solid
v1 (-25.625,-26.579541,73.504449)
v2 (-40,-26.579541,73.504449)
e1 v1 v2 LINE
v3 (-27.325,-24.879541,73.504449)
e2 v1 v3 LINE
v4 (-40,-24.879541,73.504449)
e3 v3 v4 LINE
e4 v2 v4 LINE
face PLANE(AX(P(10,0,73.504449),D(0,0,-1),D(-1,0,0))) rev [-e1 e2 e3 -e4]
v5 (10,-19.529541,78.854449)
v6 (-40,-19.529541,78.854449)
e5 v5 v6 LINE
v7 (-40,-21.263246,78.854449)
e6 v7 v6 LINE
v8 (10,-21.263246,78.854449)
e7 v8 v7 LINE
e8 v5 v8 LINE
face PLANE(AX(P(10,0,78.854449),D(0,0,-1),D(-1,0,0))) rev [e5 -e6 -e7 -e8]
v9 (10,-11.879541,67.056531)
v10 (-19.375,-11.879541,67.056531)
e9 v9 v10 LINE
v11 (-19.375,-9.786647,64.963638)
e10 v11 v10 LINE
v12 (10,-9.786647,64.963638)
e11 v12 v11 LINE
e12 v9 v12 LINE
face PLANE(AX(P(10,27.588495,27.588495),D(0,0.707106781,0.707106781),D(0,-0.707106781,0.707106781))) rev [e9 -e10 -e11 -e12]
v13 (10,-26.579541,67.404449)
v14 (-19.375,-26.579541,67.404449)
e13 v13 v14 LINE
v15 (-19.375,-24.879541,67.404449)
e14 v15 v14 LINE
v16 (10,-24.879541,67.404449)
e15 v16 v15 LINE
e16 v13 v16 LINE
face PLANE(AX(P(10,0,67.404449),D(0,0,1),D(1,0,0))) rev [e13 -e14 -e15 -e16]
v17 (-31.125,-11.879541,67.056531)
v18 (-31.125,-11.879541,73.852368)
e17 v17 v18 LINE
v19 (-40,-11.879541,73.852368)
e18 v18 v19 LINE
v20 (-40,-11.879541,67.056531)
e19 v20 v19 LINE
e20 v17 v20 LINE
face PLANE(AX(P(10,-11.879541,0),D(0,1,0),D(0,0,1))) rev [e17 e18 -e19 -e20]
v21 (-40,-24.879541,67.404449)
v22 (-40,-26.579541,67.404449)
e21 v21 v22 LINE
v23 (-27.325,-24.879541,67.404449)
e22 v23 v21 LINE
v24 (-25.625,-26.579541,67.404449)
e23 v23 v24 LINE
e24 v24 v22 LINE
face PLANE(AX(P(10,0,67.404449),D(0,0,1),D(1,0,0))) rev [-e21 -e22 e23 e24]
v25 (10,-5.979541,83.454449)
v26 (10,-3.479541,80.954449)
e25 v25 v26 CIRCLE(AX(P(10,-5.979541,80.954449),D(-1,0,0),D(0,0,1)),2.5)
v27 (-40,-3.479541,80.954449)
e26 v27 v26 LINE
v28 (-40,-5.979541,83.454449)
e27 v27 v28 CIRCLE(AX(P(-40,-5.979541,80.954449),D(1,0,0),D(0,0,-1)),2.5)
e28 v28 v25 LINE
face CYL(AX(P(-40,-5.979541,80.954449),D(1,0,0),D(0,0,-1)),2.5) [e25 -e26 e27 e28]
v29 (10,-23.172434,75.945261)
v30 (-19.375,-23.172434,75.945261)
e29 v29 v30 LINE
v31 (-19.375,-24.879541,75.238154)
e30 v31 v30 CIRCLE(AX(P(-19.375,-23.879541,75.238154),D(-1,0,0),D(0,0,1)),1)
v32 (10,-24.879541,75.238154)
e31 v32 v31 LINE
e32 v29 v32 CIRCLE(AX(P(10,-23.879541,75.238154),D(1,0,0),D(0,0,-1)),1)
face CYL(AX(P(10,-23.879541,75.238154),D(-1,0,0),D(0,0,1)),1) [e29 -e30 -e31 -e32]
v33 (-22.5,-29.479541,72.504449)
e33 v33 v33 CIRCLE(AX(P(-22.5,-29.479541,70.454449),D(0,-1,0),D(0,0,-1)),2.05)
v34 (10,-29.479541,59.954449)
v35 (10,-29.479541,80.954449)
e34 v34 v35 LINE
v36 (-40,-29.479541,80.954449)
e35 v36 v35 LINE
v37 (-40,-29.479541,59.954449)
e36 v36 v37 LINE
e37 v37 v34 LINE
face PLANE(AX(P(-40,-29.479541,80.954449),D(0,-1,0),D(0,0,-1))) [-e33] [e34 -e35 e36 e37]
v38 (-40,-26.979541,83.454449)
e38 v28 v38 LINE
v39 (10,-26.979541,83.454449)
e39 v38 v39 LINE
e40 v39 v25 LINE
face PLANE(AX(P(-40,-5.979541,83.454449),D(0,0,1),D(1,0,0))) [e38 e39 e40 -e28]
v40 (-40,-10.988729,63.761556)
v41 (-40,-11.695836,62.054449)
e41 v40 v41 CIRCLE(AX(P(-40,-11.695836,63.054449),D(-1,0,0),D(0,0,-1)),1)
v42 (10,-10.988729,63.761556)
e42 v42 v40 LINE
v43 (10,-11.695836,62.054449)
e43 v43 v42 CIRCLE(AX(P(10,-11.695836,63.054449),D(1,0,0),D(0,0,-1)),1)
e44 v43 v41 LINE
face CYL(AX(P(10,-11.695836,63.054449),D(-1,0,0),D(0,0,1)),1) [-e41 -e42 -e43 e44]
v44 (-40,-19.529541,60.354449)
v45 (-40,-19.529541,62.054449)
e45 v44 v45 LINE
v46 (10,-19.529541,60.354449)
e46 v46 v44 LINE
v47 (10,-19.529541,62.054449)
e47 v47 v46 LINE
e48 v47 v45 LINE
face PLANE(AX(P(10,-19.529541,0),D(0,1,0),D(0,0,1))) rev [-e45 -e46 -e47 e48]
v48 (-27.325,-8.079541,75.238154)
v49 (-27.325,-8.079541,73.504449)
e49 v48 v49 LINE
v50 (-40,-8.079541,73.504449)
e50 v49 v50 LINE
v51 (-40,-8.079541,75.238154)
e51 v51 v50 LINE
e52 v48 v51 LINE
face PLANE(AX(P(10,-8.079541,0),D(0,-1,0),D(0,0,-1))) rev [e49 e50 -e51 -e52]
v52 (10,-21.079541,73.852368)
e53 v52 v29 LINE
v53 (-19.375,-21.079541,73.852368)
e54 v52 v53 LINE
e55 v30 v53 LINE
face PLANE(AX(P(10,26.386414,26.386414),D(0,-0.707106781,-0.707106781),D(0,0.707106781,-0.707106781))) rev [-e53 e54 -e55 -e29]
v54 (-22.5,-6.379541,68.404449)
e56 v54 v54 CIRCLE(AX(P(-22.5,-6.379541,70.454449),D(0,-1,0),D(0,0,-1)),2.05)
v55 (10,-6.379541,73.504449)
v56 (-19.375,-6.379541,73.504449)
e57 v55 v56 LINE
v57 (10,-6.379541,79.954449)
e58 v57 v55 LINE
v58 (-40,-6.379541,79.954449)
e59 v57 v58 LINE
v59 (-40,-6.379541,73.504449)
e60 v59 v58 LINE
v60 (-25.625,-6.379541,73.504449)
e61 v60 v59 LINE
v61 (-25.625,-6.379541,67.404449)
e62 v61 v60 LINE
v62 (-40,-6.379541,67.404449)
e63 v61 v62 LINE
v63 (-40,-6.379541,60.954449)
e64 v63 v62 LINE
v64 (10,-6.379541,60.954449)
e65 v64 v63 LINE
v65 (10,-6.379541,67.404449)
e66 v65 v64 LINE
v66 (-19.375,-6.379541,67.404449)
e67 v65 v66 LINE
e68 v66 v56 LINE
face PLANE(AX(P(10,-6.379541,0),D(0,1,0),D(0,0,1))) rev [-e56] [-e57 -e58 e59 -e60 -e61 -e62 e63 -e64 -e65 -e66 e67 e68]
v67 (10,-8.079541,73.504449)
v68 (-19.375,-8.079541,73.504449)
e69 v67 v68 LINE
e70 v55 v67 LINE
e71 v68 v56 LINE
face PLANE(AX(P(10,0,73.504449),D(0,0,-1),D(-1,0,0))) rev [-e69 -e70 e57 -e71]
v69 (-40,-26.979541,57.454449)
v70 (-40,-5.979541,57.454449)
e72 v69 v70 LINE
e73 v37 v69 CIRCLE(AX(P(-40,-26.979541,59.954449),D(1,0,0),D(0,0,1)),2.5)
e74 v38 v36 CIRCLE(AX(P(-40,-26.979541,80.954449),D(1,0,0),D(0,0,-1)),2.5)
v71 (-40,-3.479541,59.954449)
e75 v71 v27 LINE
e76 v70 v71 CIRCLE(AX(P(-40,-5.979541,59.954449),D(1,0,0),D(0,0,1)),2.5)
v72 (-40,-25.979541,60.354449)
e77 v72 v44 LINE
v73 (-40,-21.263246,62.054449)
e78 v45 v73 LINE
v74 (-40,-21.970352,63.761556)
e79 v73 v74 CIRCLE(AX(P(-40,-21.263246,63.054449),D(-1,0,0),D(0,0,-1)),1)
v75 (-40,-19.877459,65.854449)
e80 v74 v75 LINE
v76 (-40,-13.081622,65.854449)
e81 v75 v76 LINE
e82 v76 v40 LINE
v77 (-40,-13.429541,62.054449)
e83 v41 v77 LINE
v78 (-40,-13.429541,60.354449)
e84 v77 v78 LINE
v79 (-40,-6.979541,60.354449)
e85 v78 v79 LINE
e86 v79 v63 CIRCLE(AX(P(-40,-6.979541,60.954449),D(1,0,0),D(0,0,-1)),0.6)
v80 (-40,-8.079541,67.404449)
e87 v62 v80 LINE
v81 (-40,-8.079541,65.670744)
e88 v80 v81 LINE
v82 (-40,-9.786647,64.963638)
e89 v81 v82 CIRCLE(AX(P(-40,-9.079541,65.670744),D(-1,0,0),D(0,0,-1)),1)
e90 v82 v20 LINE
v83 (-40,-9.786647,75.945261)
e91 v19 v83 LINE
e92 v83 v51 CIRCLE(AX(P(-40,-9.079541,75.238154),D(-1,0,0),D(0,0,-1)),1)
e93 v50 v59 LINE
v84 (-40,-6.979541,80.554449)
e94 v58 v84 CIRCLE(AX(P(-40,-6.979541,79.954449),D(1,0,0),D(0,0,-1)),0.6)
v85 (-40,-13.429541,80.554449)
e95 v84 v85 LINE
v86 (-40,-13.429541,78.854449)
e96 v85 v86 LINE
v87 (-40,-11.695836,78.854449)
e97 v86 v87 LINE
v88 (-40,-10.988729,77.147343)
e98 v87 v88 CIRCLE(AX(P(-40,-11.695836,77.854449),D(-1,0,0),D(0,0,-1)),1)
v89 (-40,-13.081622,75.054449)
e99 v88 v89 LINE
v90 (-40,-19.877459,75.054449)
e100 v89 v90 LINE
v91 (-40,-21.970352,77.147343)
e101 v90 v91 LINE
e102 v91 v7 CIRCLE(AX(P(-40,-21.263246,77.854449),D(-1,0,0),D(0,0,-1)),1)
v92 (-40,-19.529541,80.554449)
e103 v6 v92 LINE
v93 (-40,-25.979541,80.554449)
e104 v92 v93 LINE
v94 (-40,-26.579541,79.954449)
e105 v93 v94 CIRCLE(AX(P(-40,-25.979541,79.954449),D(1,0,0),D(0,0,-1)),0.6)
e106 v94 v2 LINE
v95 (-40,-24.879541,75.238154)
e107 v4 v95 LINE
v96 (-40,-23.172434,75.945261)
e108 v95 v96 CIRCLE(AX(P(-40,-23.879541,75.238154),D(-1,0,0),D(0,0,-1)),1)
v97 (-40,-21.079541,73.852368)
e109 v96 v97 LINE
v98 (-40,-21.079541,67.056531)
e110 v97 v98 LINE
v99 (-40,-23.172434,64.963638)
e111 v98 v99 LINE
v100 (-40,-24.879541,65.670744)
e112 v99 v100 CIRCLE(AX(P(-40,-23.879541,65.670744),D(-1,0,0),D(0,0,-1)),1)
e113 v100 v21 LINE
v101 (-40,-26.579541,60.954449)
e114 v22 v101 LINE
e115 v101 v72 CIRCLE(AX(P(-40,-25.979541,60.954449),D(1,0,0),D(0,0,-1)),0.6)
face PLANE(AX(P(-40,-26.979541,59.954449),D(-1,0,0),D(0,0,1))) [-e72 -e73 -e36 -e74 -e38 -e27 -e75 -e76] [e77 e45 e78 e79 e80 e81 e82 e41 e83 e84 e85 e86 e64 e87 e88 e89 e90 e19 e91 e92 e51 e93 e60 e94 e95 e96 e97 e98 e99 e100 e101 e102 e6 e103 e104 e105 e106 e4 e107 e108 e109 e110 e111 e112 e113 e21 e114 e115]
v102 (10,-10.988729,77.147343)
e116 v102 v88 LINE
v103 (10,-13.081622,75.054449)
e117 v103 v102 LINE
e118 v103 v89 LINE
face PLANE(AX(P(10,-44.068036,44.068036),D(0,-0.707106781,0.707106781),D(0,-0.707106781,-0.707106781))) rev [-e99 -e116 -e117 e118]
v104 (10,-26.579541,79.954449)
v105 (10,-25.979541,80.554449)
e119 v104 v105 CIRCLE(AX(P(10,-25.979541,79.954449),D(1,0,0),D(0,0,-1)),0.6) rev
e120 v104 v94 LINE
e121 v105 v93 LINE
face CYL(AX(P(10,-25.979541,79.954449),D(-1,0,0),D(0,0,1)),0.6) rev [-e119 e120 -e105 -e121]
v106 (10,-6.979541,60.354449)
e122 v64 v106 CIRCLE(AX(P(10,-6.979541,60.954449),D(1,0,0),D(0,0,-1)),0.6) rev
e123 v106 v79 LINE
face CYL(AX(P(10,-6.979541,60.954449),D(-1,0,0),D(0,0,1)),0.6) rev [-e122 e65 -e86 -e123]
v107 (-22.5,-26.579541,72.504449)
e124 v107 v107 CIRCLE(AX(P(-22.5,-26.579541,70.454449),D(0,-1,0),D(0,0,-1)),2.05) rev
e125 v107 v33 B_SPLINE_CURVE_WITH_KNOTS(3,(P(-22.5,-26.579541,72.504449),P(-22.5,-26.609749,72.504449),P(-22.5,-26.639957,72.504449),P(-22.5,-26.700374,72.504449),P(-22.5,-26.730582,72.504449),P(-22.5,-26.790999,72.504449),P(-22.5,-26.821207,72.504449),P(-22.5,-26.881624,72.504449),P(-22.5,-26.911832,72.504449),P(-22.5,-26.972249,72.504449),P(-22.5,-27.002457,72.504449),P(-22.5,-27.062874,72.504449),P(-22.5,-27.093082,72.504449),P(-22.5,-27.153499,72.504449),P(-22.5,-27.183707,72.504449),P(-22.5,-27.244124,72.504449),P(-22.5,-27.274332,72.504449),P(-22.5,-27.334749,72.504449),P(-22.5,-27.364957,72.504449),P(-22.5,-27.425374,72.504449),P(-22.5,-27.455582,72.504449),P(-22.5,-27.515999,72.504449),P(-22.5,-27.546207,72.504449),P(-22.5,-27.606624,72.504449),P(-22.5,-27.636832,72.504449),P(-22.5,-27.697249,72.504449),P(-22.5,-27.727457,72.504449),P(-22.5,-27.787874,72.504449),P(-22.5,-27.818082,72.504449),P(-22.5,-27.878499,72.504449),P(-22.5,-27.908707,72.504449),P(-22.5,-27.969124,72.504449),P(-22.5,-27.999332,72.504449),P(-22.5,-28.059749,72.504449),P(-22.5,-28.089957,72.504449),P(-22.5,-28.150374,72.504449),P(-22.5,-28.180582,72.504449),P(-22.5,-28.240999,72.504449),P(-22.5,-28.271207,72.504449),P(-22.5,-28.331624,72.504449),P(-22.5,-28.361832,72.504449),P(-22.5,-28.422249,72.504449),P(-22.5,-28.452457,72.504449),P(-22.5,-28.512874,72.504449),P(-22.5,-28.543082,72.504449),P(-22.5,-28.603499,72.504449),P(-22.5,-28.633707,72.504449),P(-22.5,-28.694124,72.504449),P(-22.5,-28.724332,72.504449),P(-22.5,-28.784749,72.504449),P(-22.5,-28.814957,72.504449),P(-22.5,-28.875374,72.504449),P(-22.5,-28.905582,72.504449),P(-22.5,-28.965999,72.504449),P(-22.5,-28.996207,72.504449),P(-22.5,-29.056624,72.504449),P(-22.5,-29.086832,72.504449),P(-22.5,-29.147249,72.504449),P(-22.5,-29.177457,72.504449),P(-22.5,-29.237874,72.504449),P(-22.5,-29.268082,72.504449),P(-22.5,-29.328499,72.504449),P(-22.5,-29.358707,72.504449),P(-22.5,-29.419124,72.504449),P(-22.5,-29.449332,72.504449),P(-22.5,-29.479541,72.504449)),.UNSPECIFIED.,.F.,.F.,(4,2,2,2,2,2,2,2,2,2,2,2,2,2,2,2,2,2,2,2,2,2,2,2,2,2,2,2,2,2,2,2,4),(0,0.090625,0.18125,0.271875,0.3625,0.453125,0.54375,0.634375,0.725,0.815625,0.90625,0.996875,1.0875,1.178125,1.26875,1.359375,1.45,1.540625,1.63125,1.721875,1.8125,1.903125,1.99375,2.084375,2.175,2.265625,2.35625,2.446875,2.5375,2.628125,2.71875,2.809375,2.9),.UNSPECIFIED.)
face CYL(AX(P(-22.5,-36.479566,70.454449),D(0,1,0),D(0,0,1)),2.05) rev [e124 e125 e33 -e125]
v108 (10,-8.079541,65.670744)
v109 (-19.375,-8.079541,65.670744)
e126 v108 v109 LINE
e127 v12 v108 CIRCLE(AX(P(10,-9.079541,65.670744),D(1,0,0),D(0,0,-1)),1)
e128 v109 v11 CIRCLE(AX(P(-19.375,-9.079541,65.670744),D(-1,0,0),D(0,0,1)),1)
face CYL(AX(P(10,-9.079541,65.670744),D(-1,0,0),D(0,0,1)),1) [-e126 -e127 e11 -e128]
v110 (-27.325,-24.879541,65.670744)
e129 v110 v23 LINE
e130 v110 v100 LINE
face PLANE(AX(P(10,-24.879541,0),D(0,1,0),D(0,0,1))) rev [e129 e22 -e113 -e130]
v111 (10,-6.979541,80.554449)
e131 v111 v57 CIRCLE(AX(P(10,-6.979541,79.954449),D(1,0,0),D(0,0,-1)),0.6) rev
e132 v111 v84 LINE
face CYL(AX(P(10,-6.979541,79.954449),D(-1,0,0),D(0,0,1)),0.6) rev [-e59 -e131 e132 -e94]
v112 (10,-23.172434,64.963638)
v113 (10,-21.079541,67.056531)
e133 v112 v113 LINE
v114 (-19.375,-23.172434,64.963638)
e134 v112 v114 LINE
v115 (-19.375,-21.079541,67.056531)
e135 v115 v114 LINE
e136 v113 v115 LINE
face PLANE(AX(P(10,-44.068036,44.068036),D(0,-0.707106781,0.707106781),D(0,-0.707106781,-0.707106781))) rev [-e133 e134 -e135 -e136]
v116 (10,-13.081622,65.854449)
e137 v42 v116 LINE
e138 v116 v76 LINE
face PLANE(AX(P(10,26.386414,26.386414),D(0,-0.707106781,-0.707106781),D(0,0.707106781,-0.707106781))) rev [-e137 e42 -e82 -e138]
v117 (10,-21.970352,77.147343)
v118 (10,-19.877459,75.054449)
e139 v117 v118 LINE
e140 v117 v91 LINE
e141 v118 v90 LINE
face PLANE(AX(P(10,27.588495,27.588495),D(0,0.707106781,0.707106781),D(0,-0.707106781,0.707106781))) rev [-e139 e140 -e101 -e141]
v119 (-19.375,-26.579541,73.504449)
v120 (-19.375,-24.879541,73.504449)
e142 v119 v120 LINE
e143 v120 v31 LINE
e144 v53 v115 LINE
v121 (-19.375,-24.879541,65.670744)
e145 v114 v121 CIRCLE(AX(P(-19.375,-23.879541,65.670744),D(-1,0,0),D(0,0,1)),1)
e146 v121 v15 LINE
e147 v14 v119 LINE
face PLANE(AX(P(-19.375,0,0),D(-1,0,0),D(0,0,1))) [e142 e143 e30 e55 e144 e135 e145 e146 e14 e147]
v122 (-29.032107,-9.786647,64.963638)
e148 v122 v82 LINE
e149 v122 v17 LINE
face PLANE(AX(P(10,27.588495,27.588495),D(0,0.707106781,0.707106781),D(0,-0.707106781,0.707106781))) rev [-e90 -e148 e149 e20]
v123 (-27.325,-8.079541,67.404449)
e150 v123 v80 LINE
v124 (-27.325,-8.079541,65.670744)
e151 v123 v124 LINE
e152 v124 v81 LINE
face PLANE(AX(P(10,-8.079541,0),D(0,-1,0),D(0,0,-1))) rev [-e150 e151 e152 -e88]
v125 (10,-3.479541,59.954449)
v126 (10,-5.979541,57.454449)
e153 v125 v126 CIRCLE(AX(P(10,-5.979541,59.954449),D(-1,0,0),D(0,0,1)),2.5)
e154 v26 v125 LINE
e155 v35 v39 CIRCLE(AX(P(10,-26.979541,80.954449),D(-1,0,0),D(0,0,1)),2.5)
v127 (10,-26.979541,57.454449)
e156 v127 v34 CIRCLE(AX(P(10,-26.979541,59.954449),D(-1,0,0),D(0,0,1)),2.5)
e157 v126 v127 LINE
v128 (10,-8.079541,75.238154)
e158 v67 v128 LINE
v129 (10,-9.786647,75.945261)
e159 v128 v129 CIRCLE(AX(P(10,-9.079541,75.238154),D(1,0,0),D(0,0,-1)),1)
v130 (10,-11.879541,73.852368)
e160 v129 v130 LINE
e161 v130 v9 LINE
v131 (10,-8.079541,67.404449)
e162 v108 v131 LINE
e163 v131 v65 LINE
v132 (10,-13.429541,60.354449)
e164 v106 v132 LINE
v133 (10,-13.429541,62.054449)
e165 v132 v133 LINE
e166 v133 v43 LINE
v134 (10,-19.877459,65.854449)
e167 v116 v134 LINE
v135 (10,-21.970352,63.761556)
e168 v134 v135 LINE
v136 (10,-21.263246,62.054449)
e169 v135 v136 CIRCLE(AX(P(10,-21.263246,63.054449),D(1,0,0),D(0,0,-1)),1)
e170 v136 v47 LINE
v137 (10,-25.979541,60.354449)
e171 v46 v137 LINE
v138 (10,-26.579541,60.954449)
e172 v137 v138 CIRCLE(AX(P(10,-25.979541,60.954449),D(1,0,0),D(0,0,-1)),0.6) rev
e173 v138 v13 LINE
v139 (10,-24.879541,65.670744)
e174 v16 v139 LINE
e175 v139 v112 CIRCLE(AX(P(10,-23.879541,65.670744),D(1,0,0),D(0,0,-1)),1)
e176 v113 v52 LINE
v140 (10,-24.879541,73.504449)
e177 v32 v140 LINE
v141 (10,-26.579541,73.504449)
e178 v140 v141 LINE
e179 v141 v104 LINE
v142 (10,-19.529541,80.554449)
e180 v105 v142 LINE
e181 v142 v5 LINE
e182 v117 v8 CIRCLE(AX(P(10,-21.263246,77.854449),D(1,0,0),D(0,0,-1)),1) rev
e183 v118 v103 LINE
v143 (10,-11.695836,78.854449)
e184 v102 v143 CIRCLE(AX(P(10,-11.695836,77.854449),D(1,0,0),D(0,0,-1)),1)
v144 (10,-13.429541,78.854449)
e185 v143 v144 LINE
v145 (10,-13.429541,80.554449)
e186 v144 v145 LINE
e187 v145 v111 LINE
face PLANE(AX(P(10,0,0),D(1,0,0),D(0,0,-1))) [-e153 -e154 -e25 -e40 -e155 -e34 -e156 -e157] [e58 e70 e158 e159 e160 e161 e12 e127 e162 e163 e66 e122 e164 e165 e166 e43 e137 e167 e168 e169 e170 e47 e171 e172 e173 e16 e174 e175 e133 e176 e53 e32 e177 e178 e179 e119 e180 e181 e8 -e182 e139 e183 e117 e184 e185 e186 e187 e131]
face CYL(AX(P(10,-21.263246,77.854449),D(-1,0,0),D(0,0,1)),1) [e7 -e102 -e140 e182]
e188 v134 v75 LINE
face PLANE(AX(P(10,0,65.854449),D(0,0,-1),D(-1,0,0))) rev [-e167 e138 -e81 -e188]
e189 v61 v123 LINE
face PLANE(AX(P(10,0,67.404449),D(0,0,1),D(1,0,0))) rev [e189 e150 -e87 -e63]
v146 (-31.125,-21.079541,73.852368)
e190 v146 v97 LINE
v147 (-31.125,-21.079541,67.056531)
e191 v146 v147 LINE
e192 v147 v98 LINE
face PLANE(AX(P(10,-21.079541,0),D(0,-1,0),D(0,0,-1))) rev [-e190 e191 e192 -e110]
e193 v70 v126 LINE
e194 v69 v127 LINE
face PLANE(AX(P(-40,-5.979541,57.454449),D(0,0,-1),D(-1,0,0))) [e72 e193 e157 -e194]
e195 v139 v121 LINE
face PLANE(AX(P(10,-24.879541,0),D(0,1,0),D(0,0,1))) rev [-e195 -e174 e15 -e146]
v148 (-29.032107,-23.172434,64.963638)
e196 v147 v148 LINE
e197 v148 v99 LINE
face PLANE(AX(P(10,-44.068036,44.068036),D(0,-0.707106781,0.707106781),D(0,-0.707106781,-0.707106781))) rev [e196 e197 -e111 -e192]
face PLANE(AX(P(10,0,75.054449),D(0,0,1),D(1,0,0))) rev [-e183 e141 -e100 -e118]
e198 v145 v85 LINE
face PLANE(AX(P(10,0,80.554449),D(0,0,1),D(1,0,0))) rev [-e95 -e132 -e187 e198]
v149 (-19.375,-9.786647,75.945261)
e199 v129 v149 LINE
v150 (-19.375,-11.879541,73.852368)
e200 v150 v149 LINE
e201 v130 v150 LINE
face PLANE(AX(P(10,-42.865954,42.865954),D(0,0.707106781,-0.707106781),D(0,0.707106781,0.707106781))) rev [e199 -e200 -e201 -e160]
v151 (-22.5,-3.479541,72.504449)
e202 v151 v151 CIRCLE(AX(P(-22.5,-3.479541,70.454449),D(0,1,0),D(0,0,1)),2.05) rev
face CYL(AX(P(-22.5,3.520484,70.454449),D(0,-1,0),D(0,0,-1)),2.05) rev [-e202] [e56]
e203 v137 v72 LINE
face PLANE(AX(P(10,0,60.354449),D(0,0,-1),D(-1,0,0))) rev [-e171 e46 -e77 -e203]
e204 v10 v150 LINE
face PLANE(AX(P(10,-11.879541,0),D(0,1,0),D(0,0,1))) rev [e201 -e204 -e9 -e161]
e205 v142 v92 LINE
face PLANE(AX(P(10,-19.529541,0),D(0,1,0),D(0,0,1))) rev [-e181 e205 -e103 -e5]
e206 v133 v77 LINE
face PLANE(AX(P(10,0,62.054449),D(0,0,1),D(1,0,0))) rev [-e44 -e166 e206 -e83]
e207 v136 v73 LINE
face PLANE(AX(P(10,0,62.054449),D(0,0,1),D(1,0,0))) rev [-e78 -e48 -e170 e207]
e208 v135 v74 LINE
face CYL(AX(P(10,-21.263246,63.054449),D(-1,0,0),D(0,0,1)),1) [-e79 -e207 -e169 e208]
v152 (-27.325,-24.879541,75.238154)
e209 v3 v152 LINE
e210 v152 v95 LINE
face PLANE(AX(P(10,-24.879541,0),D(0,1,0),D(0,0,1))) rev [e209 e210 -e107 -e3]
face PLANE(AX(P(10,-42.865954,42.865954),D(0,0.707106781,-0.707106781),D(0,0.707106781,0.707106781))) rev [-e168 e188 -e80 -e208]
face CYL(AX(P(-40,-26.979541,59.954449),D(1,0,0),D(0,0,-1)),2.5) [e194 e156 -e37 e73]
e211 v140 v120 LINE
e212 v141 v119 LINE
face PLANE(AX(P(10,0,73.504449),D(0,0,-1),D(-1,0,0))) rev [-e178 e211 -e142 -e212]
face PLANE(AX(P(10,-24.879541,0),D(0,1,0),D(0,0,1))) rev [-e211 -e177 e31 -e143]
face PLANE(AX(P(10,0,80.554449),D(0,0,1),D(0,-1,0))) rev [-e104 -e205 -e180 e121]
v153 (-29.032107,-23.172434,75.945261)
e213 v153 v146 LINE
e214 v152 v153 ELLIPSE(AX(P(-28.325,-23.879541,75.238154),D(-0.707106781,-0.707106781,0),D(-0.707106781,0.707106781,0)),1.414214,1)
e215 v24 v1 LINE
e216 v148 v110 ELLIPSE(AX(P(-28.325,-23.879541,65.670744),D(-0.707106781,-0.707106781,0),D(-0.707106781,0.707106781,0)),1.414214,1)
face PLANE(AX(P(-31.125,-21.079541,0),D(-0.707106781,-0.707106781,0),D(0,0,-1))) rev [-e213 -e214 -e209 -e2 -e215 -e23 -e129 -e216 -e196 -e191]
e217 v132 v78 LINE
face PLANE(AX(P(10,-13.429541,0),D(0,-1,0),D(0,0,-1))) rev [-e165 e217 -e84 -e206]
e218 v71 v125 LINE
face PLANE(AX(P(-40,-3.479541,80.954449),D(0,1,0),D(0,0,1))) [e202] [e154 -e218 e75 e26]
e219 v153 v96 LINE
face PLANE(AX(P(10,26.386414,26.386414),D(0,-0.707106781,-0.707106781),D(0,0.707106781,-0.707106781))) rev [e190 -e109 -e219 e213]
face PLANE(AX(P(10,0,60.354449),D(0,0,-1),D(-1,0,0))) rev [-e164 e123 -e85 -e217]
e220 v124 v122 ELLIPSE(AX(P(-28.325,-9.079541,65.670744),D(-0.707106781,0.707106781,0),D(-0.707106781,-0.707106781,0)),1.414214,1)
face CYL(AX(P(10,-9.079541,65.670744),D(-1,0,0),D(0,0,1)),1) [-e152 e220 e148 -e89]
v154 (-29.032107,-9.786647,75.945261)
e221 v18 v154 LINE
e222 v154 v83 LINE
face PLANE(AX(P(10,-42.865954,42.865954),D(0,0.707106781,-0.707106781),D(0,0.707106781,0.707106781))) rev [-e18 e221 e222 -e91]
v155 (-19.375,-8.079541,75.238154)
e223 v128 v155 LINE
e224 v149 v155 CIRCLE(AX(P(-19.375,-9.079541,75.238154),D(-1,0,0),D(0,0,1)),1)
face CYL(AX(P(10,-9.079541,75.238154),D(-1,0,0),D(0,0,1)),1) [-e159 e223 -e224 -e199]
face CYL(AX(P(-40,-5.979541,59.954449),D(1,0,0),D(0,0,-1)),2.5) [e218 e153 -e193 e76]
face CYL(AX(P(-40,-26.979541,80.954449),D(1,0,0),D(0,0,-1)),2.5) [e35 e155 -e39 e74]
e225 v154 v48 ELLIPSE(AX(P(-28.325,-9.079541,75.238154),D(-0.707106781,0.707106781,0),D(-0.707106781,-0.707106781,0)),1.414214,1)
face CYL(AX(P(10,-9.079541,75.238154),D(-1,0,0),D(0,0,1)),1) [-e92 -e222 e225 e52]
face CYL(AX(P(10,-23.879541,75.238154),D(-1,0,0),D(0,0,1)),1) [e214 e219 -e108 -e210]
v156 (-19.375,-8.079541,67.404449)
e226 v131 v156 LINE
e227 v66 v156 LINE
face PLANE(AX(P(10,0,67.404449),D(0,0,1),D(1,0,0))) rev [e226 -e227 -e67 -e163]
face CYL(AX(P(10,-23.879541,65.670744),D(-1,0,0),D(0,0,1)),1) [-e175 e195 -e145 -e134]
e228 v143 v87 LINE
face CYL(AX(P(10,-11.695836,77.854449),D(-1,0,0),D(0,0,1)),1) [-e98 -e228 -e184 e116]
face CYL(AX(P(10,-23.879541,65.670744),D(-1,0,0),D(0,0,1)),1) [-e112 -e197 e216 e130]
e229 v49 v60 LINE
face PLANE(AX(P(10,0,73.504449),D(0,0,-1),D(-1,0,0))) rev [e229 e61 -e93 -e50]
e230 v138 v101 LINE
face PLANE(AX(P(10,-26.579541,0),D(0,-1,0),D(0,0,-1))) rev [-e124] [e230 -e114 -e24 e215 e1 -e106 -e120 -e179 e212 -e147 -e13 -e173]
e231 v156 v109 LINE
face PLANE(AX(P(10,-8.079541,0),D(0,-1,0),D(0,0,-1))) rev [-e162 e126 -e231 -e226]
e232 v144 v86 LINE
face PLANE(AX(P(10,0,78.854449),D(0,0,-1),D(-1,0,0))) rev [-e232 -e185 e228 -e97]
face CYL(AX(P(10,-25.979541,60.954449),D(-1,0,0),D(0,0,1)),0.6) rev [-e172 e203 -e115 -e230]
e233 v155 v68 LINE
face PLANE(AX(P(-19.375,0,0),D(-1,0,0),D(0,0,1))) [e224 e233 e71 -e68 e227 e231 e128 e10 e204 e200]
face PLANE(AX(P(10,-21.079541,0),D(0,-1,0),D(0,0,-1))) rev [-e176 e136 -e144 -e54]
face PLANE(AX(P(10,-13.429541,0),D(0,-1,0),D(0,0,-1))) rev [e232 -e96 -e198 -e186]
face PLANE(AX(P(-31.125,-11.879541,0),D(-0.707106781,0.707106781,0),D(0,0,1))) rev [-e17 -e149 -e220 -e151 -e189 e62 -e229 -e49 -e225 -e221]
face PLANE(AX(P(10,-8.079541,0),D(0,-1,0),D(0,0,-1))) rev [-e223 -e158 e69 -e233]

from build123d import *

# Parameters (mm, degrees)
BOSS_EXTRUDE1_DEPTH      = 39
BOSS_EXTRUDE1_DEPTH_BACK = 10
SKETCH1_W                = 42
SKETCH1_H                = 40
CUT_EXTRUDE3_DEPTH       = 68.939361812
CUT_EXTRUDE3_DEPTH_BACK  = 68.939361812
BOSS_EXTRUDE2_DEPTH      = 40
CUT_EXTRUDE7_START       = -10
SKETCH7_R                = 2.05
CUT_EXTRUDE7_DEPTH       = 116.132850877
CUT_EXTRUDE8_DEPTH       = 3.125
SKETCH9_R                = 2.778089848
BOSS_EXTRUDE3_DEPTH      = 6
CIRPATTERN1_COUNT        = 2
SKETCH10_W               = 6.985924482
SKETCH10_H               = 7.120269183
CUT_EXTRUDE13_DEPTH      = 8
SKETCH14_OUTSIDE_W       = 59.316
SKETCH14_OUTSIDE_H       = 57.316
CUT_EXTRUDE14_DEPTH      = 111.429494292
CHAMFER1_SIZE            = 5.5


with BuildPart() as part:
    # Sketch1 → Boss-Extrude1 (new, two sides: drawn at the far end of the back side and taken through both)
    with BuildSketch(Plane.ZY.offset(-BOSS_EXTRUDE1_DEPTH_BACK)):
        with Locations((70.454449321, -16.479540615)):
            Rectangle(SKETCH1_W, SKETCH1_H)
        with BuildLine():
            Line((77.147342539, -21.970352305), (75.054449321, -19.877459087))
            Line((75.054449321, -19.877459087), (75.054449321, -13.081622143))
            Line((75.054449321, -13.081622143), (77.147342539, -10.988728924))
            ThreePointArc((77.147342539, -10.988728924), (78.237132753, -10.771956173), (78.854449321, -11.695835705))
            Line((78.854449321, -11.695835705), (78.854449321, -13.429540615))
            Line((78.854449321, -13.429540615), (80.554449321, -13.429540615))
            Line((80.554449321, -13.429540615), (80.554449321, -6.979540615))
            ThreePointArc((80.554449321, -6.979540615), (80.378713389, -6.555276546), (79.954449321, -6.379540615))
            Line((79.954449321, -6.379540615), (73.504449321, -6.379540615))
            Line((73.504449321, -6.379540615), (73.504449321, -8.079540615))
            Line((73.504449321, -8.079540615), (75.23815423, -8.079540615))
            ThreePointArc((75.23815423, -8.079540615), (76.162033763, -8.696857182), (75.945261011, -9.786647396))
            Line((75.945261011, -9.786647396), (73.852367793, -11.879540615))
            Line((73.852367793, -11.879540615), (67.056530849, -11.879540615))
            Line((67.056530849, -11.879540615), (64.96363763, -9.786647396))
            ThreePointArc((64.96363763, -9.786647396), (64.746864878, -8.696857182), (65.670744411, -8.079540615))
            Line((65.670744411, -8.079540615), (67.404449321, -8.079540615))
            Line((67.404449321, -8.079540615), (67.404449321, -6.379540615))
            Line((67.404449321, -6.379540615), (60.954449321, -6.379540615))
            ThreePointArc((60.954449321, -6.379540615), (60.530185252, -6.555276546), (60.354449321, -6.979540615))
            Line((60.354449321, -6.979540615), (60.354449321, -13.429540615))
            Line((60.354449321, -13.429540615), (62.054449321, -13.429540615))
            Line((62.054449321, -13.429540615), (62.054449321, -11.695835705))
            ThreePointArc((62.054449321, -11.695835705), (62.671765888, -10.771956173), (63.761556102, -10.988728924))
            Line((63.761556102, -10.988728924), (65.854449321, -13.081622143))
            Line((65.854449321, -13.081622143), (65.854449321, -19.877459087))
            Line((65.854449321, -19.877459087), (63.761556102, -21.970352305))
            ThreePointArc((63.761556102, -21.970352305), (62.671765888, -22.187125057), (62.054449321, -21.263245524))
            Line((62.054449321, -21.263245524), (62.054449321, -19.529540615))
            Line((62.054449321, -19.529540615), (60.354449321, -19.529540615))
            Line((60.354449321, -19.529540615), (60.354449321, -25.979540615))
            ThreePointArc((60.354449321, -25.979540615), (60.530185252, -26.403804683), (60.954449321, -26.579540615))
            Line((60.954449321, -26.579540615), (67.404449321, -26.579540615))
            Line((67.404449321, -26.579540615), (67.404449321, -24.879540615))
            Line((67.404449321, -24.879540615), (65.670744411, -24.879540615))
            ThreePointArc((65.670744411, -24.879540615), (64.746864878, -24.262224047), (64.96363763, -23.172433833))
            Line((64.96363763, -23.172433833), (67.056530849, -21.079540615))
            Line((67.056530849, -21.079540615), (73.852367793, -21.079540615))
            Line((73.852367793, -21.079540615), (75.945261011, -23.172433833))
            ThreePointArc((75.945261011, -23.172433833), (76.162033763, -24.262224047), (75.23815423, -24.879540615))
            Line((75.23815423, -24.879540615), (73.504449321, -24.879540615))
            Line((73.504449321, -24.879540615), (73.504449321, -26.579540615))
            Line((73.504449321, -26.579540615), (79.954449321, -26.579540615))
            ThreePointArc((79.954449321, -26.579540615), (80.378713389, -26.403804683), (80.554449321, -25.979540615))
            Line((80.554449321, -25.979540615), (80.554449321, -19.529540615))
            Line((80.554449321, -19.529540615), (78.854449321, -19.529540615))
            Line((78.854449321, -19.529540615), (78.854449321, -21.263245524))
            ThreePointArc((78.854449321, -21.263245524), (78.237132753, -22.187125057), (77.147342539, -21.970352305))
        make_face(mode=Mode.SUBTRACT)
    extrude(amount=BOSS_EXTRUDE1_DEPTH + BOSS_EXTRUDE1_DEPTH_BACK)

    # Sketch2 → Cut-Extrude3 (cut, two sides: drawn at the far end of the back side and taken through both)
    with BuildSketch(Plane(origin=(0, 0, 91.454449321), x_dir=(-1, 0, 0), z_dir=(0, 0, -1)).offset(-CUT_EXTRUDE3_DEPTH_BACK)):
        with BuildLine():
            Line((9, 3.520459385), (39, 3.520459385))
            Line((39, 3.520459385), (39, -36.479540615))
            Line((39, -36.479540615), (30.968670474, -36.479540615))
            ThreePointArc((30.968670474, -36.479540615), (30.884335237, -36.480014542), (30.8, -36.479540615))
            Line((30.8, -36.479540615), (30.8, -37.552822487))
            Line((30.8, -37.552822487), (41.446354872, -37.552822487))
            Line((41.446354872, -37.552822487), (41.446354872, 6.899861608))
            Line((41.446354872, 6.899861608), (9, 6.899861608))
            Line((9, 6.899861608), (9, 3.520459385))
        make_face()
        with BuildLine():
            Line((39, -36.479540615), (39, 3.520459385))
            Line((39, 3.520459385), (9, 3.520459385))
            Line((9, 3.520459385), (36.19042941, -23.669970025))
            ThreePointArc((36.19042941, -23.669970025), (37.833109012, -31.808697916), (30.968670474, -36.479540615))
            Line((30.968670474, -36.479540615), (39, -36.479540615))
        make_face()
    extrude(amount=CUT_EXTRUDE3_DEPTH + CUT_EXTRUDE3_DEPTH_BACK, mode=Mode.SUBTRACT)

    # Sketch4 → Boss-Extrude2 (add)
    with BuildSketch(Plane(origin=(0, 0, 0), x_dir=(0, 0, -1), z_dir=(1, 0, 0))):
        with BuildLine():
            Line((-80.954449321, -3.479540615), (-59.954449321, -3.479540615))
            ThreePointArc((-59.954449321, -3.479540615), (-58.186682368, -4.211773662), (-57.454449321, -5.979540615))
            Line((-57.454449321, -5.979540615), (-57.454449321, -26.979540615))
            ThreePointArc((-57.454449321, -26.979540615), (-58.186682368, -28.747307568), (-59.954449321, -29.479540615))
            Line((-59.954449321, -29.479540615), (-80.954449321, -29.479540615))
            ThreePointArc((-80.954449321, -29.479540615), (-82.722216274, -28.747307568), (-83.454449321, -26.979540615))
            Line((-83.454449321, -26.979540615), (-83.454449321, -5.979540615))
            ThreePointArc((-83.454449321, -5.979540615), (-82.722216274, -4.211773662), (-80.954449321, -3.479540615))
        make_face()
        with BuildLine():
            Line((-62.054449321, -11.695835705), (-62.054449321, -13.429540615))
            Line((-62.054449321, -13.429540615), (-60.354449321, -13.429540615))
            Line((-60.354449321, -13.429540615), (-60.354449321, -6.979540615))
            ThreePointArc((-60.354449321, -6.979540615), (-60.530185252, -6.555276546), (-60.954449321, -6.379540615))
            Line((-60.954449321, -6.379540615), (-67.404449321, -6.379540615))
            Line((-67.404449321, -6.379540615), (-67.404449321, -8.079540615))
            Line((-67.404449321, -8.079540615), (-65.670744411, -8.079540615))
            ThreePointArc((-65.670744411, -8.079540615), (-64.746864878, -8.696857182), (-64.96363763, -9.786647396))
            Line((-64.96363763, -9.786647396), (-67.056530849, -11.879540615))
            Line((-67.056530849, -11.879540615), (-73.852367793, -11.879540615))
            Line((-73.852367793, -11.879540615), (-75.945261011, -9.786647396))
            ThreePointArc((-75.945261011, -9.786647396), (-76.162033763, -8.696857182), (-75.23815423, -8.079540615))
            Line((-75.23815423, -8.079540615), (-73.504449321, -8.079540615))
            Line((-73.504449321, -8.079540615), (-73.504449321, -6.379540615))
            Line((-73.504449321, -6.379540615), (-79.954449321, -6.379540615))
            ThreePointArc((-79.954449321, -6.379540615), (-80.378713389, -6.555276546), (-80.554449321, -6.979540615))
            Line((-80.554449321, -6.979540615), (-80.554449321, -13.429540615))
            Line((-80.554449321, -13.429540615), (-78.854449321, -13.429540615))
            Line((-78.854449321, -13.429540615), (-78.854449321, -11.695835705))
            ThreePointArc((-78.854449321, -11.695835705), (-78.237132753, -10.771956173), (-77.147342539, -10.988728924))
            Line((-77.147342539, -10.988728924), (-75.054449321, -13.081622143))
            Line((-75.054449321, -13.081622143), (-75.054449321, -19.877459087))
            Line((-75.054449321, -19.877459087), (-77.147342539, -21.970352305))
            ThreePointArc((-77.147342539, -21.970352305), (-78.237132753, -22.187125057), (-78.854449321, -21.263245524))
            Line((-78.854449321, -21.263245524), (-78.854449321, -19.529540615))
            Line((-78.854449321, -19.529540615), (-80.554449321, -19.529540615))
            Line((-80.554449321, -19.529540615), (-80.554449321, -25.979540615))
            ThreePointArc((-80.554449321, -25.979540615), (-80.378713389, -26.403804683), (-79.954449321, -26.579540615))
            Line((-79.954449321, -26.579540615), (-73.504449321, -26.579540615))
            Line((-73.504449321, -26.579540615), (-73.504449321, -24.879540615))
            Line((-73.504449321, -24.879540615), (-75.23815423, -24.879540615))
            ThreePointArc((-75.23815423, -24.879540615), (-76.162033763, -24.262224047), (-75.945261011, -23.172433833))
            Line((-75.945261011, -23.172433833), (-73.852367793, -21.079540615))
            Line((-73.852367793, -21.079540615), (-67.056530849, -21.079540615))
            Line((-67.056530849, -21.079540615), (-64.96363763, -23.172433833))
            ThreePointArc((-64.96363763, -23.172433833), (-64.746864878, -24.262224047), (-65.670744411, -24.879540615))
            Line((-65.670744411, -24.879540615), (-67.404449321, -24.879540615))
            Line((-67.404449321, -24.879540615), (-67.404449321, -26.579540615))
            Line((-67.404449321, -26.579540615), (-60.954449321, -26.579540615))
            ThreePointArc((-60.954449321, -26.579540615), (-60.530185252, -26.403804683), (-60.354449321, -25.979540615))
            Line((-60.354449321, -25.979540615), (-60.354449321, -19.529540615))
            Line((-60.354449321, -19.529540615), (-62.054449321, -19.529540615))
            Line((-62.054449321, -19.529540615), (-62.054449321, -21.263245524))
            ThreePointArc((-62.054449321, -21.263245524), (-62.671765888, -22.187125057), (-63.761556102, -21.970352305))
            Line((-63.761556102, -21.970352305), (-65.854449321, -19.877459087))
            Line((-65.854449321, -19.877459087), (-65.854449321, -13.081622143))
            Line((-65.854449321, -13.081622143), (-63.761556102, -10.988728924))
            ThreePointArc((-63.761556102, -10.988728924), (-62.671765888, -10.771956173), (-62.054449321, -11.695835705))
        make_face(mode=Mode.SUBTRACT)
    extrude(amount=-BOSS_EXTRUDE2_DEPTH)

    # Sketch7 → Cut-Extrude7 (cut)
    with BuildSketch(Plane(origin=(0, -3.479540615, 0), x_dir=(1, 0, 0), z_dir=(0, 1, 0)).offset(CUT_EXTRUDE7_START)):
        with Locations(Location((-22.5, -70.454449321, 0), (0, 0, 270))):
            Circle(SKETCH7_R)
    cut_extrude7 = extrude(amount=CUT_EXTRUDE7_DEPTH, mode=Mode.SUBTRACT)

    # Sketch8 → Cut-Extrude8 (cut, symmetric)
    with BuildSketch(Plane.ZY.offset(22.5)):
        Polygon((60.954449321, -6.379540615), (79.954449321, -6.379540615), (70.690797066, -16.49195704), align=None)
        Polygon((70.690797066, -16.49195704), (60.954449321, -26.579540615), (79.954449321, -26.579540615), align=None)
    extrude(amount=CUT_EXTRUDE8_DEPTH, both=True, mode=Mode.SUBTRACT)

    # CirPattern1: Cut-Extrude7 ×2 about axis
    cirpattern1_axis = Axis((-34, -16.479540615, 70.454449321), (-1, 0, 0))
    for i in range(1, CIRPATTERN1_COUNT):
        add(cut_extrude7.rotate(cirpattern1_axis, i * 360 / CIRPATTERN1_COUNT), mode=Mode.SUBTRACT)

    # Sketch14 outside → Cut-Extrude14 (cut, through all)
    with BuildSketch(Plane.ZY.offset(40)):
        with Locations((70.454, -16.48)):
            Rectangle(SKETCH14_OUTSIDE_W, SKETCH14_OUTSIDE_H)
        with BuildLine():
            Line((59.954449321, -29.479540615), (80.954449321, -29.479540615))
            ThreePointArc((80.954449321, -29.479540615), (82.722216274, -28.747307568), (83.454449321, -26.979540615))
            Line((83.454449321, -26.979540615), (83.454449321, -5.979540615))
            ThreePointArc((83.454449321, -5.979540615), (82.722216274, -4.211773662), (80.954449321, -3.479540615))
            Line((80.954449321, -3.479540615), (59.954449321, -3.479540615))
            ThreePointArc((59.954449321, -3.479540615), (58.186682368, -4.211773662), (57.454449321, -5.979540615))
            Line((57.454449321, -5.979540615), (57.454449321, -26.979540615))
            ThreePointArc((57.454449321, -26.979540615), (58.186682368, -28.747307568), (59.954449321, -29.479540615))
        make_face(mode=Mode.SUBTRACT)
    extrude(amount=-CUT_EXTRUDE14_DEPTH, mode=Mode.SUBTRACT)

    # Chamfer1
    chamfer1_edges = [part.edges().sort_by_distance(p)[0] for p in [
        (-25.625, -11.879540615, 70.454449321),
        (-25.625, -21.079540615, 70.454449321),
    ]]
    chamfer(chamfer1_edges, length=CHAMFER1_SIZE - 0.0001)  # a hair under: the kernel refuses the full size


with BuildPart() as body_2:
    # Sketch9 → Boss-Extrude3 (new body)
    with BuildSketch(Plane.ZY.offset(40)):
        with Locations((70.454449321, -16.479540615)):
            Circle(SKETCH9_R)
    extrude(amount=-BOSS_EXTRUDE3_DEPTH)

    # Sketch10 → Cut-Extrude13 (cut, symmetric)
    with BuildSketch(Plane.ZY.offset(40)):
        with Locations((70.605937199, -16.255142793)):
            Rectangle(SKETCH10_W, SKETCH10_H)
    extrude(amount=CUT_EXTRUDE13_DEPTH, both=True, mode=Mode.SUBTRACT)


solid = part.part
